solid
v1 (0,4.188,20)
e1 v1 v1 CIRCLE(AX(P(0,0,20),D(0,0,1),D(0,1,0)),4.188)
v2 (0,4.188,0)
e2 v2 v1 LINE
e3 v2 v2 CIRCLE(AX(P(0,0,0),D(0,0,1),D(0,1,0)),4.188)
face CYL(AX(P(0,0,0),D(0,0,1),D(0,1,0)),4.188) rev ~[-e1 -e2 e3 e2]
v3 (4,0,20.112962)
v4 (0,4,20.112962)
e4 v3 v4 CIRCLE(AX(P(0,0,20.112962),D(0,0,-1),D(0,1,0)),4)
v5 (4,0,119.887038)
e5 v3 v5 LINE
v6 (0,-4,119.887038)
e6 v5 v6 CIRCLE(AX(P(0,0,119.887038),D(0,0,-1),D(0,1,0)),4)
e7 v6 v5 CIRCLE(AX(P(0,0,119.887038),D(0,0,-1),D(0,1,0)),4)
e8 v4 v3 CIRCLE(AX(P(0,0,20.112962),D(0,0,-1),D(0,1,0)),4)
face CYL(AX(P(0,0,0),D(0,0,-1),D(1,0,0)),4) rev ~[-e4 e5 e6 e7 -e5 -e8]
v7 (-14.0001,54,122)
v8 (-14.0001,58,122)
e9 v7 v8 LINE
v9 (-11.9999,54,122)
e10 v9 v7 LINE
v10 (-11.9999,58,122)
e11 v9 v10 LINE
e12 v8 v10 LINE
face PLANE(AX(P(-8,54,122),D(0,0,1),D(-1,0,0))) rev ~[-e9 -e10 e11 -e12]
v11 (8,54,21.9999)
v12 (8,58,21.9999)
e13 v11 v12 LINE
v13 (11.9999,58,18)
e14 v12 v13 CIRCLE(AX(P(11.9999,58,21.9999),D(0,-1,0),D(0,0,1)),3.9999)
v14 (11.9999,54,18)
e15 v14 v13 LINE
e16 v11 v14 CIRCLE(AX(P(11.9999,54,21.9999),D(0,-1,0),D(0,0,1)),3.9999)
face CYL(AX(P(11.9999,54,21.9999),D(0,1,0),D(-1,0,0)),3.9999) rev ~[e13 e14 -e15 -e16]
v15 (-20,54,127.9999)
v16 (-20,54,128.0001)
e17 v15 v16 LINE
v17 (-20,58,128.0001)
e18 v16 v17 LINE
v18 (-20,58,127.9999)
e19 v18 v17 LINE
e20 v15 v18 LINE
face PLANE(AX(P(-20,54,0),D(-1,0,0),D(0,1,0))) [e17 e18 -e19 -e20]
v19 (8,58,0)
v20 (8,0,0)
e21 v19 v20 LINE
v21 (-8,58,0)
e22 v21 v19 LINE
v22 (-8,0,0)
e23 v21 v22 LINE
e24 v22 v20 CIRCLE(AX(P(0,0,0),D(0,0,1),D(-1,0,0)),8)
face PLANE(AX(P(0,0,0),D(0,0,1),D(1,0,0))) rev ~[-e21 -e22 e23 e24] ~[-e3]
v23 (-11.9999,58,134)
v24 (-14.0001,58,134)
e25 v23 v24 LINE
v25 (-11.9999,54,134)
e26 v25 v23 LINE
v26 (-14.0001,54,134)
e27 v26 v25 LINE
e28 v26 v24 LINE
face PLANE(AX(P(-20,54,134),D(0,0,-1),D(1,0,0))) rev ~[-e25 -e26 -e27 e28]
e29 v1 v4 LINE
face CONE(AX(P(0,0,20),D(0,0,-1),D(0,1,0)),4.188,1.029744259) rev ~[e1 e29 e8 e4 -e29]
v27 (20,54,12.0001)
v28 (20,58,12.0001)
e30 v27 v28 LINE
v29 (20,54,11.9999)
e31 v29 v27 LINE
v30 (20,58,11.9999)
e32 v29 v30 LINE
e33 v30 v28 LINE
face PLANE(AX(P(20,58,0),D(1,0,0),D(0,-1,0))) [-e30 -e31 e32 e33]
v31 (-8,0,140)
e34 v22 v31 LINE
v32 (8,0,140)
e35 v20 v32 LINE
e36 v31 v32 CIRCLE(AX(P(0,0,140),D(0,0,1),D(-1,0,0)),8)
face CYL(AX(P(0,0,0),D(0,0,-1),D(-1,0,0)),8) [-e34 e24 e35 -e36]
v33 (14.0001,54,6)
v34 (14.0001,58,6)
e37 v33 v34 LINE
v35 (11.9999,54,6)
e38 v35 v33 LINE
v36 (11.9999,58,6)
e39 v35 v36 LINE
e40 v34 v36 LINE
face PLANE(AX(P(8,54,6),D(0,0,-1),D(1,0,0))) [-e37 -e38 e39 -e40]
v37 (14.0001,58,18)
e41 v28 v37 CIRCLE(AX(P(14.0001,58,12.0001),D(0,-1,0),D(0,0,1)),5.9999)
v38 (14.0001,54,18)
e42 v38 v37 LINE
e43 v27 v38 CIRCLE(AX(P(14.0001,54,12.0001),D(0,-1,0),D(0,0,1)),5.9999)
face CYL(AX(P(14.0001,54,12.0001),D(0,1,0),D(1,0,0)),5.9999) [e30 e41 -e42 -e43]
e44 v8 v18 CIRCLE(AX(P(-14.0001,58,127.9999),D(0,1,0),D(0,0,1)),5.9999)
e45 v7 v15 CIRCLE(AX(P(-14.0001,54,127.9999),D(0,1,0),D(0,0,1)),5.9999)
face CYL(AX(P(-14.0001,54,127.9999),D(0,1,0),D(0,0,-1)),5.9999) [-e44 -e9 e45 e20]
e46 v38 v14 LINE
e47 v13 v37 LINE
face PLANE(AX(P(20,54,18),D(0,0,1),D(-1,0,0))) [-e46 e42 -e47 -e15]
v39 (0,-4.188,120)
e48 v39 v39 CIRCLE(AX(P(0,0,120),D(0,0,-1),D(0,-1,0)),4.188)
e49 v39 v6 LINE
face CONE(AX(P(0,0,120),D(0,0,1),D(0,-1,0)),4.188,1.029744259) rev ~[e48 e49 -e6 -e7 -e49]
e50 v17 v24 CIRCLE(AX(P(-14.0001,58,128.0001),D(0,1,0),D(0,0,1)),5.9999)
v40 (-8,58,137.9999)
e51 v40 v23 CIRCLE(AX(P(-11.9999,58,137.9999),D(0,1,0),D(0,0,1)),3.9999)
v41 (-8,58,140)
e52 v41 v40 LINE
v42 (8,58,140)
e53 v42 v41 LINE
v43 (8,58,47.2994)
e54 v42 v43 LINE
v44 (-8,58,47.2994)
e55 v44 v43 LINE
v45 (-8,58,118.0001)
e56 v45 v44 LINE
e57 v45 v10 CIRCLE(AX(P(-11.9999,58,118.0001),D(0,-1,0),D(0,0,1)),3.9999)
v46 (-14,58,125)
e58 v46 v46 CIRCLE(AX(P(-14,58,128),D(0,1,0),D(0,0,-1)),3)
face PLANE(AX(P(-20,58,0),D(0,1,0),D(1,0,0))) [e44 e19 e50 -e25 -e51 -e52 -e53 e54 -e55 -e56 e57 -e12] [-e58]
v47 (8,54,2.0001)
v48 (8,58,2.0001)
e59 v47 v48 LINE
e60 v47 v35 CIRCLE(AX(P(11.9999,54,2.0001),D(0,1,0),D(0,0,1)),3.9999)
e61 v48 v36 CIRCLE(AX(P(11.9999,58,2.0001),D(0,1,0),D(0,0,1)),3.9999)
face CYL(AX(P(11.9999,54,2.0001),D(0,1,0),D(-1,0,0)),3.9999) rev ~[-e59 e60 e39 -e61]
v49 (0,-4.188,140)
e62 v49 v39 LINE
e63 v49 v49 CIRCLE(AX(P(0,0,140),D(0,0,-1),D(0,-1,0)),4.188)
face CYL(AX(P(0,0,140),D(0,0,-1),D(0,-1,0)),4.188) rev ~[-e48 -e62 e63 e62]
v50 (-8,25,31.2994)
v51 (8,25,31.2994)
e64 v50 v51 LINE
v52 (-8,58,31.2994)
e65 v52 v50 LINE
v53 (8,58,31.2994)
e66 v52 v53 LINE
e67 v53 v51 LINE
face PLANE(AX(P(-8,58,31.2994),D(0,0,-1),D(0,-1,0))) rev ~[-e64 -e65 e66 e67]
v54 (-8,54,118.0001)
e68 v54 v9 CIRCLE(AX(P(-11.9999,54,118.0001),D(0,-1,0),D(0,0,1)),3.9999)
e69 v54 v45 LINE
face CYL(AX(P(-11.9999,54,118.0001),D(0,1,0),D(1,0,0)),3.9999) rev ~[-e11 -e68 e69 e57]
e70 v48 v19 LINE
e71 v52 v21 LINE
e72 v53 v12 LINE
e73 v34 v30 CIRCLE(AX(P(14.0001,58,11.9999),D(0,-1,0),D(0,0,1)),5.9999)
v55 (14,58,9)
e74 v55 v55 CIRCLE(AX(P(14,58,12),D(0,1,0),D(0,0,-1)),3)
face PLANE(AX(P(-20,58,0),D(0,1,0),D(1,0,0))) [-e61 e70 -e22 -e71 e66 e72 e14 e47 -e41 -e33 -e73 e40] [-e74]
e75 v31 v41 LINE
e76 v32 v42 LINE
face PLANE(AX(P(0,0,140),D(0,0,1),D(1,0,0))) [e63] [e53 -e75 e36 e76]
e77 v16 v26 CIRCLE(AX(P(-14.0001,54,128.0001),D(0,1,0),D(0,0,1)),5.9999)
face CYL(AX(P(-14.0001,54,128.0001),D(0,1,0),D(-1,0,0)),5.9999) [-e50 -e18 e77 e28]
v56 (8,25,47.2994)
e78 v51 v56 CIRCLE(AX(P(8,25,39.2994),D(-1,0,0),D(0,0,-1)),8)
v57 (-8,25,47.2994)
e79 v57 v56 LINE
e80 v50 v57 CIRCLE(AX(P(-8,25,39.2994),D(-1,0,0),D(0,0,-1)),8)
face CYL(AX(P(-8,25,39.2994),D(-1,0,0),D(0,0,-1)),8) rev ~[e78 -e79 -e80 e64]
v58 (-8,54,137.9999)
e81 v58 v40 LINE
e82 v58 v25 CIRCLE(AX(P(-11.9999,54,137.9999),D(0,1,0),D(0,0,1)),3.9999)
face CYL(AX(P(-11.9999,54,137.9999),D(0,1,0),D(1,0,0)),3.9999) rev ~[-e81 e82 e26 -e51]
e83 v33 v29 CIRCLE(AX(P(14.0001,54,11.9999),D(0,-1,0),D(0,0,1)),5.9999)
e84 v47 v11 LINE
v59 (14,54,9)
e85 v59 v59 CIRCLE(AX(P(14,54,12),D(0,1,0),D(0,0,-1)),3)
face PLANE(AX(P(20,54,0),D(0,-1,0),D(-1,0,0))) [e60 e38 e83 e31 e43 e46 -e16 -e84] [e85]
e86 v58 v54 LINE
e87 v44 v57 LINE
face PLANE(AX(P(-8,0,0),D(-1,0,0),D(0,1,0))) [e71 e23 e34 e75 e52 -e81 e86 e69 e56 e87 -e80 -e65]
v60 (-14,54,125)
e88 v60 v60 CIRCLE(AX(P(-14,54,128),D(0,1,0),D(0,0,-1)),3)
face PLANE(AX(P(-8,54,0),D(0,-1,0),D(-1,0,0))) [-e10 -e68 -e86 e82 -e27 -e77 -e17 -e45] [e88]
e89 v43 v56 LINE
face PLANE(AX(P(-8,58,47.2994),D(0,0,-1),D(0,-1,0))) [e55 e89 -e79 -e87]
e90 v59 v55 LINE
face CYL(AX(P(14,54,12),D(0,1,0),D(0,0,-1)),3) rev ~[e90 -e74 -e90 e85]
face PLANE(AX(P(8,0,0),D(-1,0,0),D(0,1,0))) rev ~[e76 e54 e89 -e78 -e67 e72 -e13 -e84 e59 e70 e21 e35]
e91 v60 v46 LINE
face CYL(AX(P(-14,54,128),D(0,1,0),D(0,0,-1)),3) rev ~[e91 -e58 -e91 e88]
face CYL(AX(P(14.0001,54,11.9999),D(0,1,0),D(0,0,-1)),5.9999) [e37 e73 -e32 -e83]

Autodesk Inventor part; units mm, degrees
ref_plane "YZ Plane" through (0, 0, 0) normal (1, 0, 0) x (0, 1, 0)
ref_plane "XZ Plane" through (0, 0, 0) normal (0, 1, 0) x (-1, 0, 0)
ref_plane "XY Plane" through (0, 0, 0) normal (0, 0, 1) x (1, 0, 0)
sketch "Sketch7" plane through (0, 0, 0) normal (0, 0, 1) x (1, 0, 0)
  circle A0 centre (0, 0) radius 4
  arc A1 (-8, 0) -> (8, 0) centre (0, 0) ccw
  line L0 (-8, 54) -> (-20, 54)
  line L1 (-20, 54) -> (-20, 58)
  line L2 (-20, 58) -> (0, 58)
  line L3 (0, 58) -> (20, 58)
  line L4 (20, 58) -> (20, 54)
  line L5 (20, 54) -> (8, 54)
  line L6 (-8, 0) -> (-8, 54)
  line L7 (8, 0) -> (8, 54)
  dimension "d34" = 4
  dimension "d35" = 58
  dimension "d36" = 8
  dimension "d37" = 4
  dimension "d38" = 12
extrude "Extrusion6" add sketch "Sketch7" along normal blind 140
sketch "Sketch8" plane through (-20, 54, 0) normal (0, -1, 0) x (1, 0, 0)
  line L0 (12, 140) -> (0, 140) projected
  line L1 (0, 0) -> (0, 140) projected
  line L2 (0, 0) -> (12, 0) projected
  line L3 (12, 0) -> (12, 140) projected
  line L4 (40, 140) -> (28, 140) projected
  line L5 (28, 0) -> (28, 140) projected
  line L6 (28, 0) -> (40, 0) projected
  line L7 (40, 0) -> (40, 140) projected
  line L8 (0, 134) -> (12, 134)
  line L9 (12, 134) -> (12, 122)
  line L10 (12, 122) -> (0, 122)
  line L11 (0, 122) -> (0, 134)
  line L12 (28, 6) -> (40, 6)
  line L13 (40, 6) -> (40, 18)
  line L14 (40, 18) -> (28, 18)
  line L15 (28, 18) -> (28, 6)
  point P0 (20, 0)
  dimension "d41" = 12
  dimension "d42" = 6
  dimension "d43" = 6
extrude "Extrusion7" cut sketch "Sketch8" against normal blind 140 contours L3 L8 L1 L0 | L3 L2 L1 L10 | L7 L14 L5 L4 | L7 L6 L5 L12
fillet "Fillet1" radius 6 4 edges at (20, 56, 6) (20, 56, 18) (-20, 56, 134) (-20, 56, 122)
fillet "Fillet1" radius 4 4 edges at (-8, 56, 134) (-8, 56, 122) (8, 56, 6) (8, 56, 18)
sketch "Sketch9" plane through (-14, 54, 122) normal (0, -1, 0) x (1, 0, 0)
  arc A0 (0, 12) -> (0, 0) centre (0, 6) ccw projected
  arc A1 (28, -116) -> (28, -104) centre (28, -110) ccw projected
  line L0 (28, -104) -> (26, -104) projected
  arc A2 (22, -100) -> (26, -104) centre (26, -100) ccw projected
  line L1 (22, -120) -> (22, -100) projected
  arc A3 (26, -116) -> (22, -120) centre (26, -120) ccw projected
  line L2 (26, -116) -> (28, -116) projected
  point P0 (14, -122)
hole "Hole2" at (14, 54, 12) at (-14, 54, 128) direction (0, 1, 0) diameter 6 depth 8 tip angle 118 clearance for "Flat Head Machine Screw" size "M6" standard "Ansi Metric M Profile"
sketch "Sketch10" plane through (0, 0, 140) normal (0, 0, 1) x (1, 0, 0)
  arc A0 (-8, 0) -> (8, 0) centre (0, 0) ccw projected
hole "Hole3" at (0, 0, 140) direction (0, 0, -1) diameter 8.376 depth 20 tip angle 118 thread size "M10x1.5" class "6H" standard "ANSI Metric M Profile"
sketch "Sketch11" plane through (0, 0, 0) normal (0, 0, -1) x (-1, 0, 0)
  arc A0 (-8, 0) -> (8, 0) centre (0, 0) ccw projected
hole "Hole4" at (0, 0, 0) direction (0, 0, 1) diameter 8.376 depth 20 tip angle 118 thread size "M10x1.5" class "6H" standard "ANSI Metric M Profile"
ref_plane "Work Plane3" through (0, 0, 140) normal (1, 0, 0) x (0, 0, -1)
sketch "Sketch12" plane through (-8, 0, 0) normal (-1, 0, 0) x (0, 0, 1)
  line L0 (0, 58) -> (118, 58) projected
  arc A0 (31.2994, 25) -> (47.2994, 25) centre (39.2994, 25) ccw projected
  line L1 (47.2994, 58) -> (47.2994, 25) projected
  line L2 (31.2994, 58) -> (31.2994, 25) projected
  circle A1 centre (39.2994, 25) radius 8
  line L3 (31.2994, 25) -> (31.2994, 58)
  line L4 (47.2994, 25) -> (47.2994, 58)
extrude "Extrusion8" cut sketch "Sketch12" against normal through all
properties part number "Pusher.Holder2" material "Aluminum-6061"
